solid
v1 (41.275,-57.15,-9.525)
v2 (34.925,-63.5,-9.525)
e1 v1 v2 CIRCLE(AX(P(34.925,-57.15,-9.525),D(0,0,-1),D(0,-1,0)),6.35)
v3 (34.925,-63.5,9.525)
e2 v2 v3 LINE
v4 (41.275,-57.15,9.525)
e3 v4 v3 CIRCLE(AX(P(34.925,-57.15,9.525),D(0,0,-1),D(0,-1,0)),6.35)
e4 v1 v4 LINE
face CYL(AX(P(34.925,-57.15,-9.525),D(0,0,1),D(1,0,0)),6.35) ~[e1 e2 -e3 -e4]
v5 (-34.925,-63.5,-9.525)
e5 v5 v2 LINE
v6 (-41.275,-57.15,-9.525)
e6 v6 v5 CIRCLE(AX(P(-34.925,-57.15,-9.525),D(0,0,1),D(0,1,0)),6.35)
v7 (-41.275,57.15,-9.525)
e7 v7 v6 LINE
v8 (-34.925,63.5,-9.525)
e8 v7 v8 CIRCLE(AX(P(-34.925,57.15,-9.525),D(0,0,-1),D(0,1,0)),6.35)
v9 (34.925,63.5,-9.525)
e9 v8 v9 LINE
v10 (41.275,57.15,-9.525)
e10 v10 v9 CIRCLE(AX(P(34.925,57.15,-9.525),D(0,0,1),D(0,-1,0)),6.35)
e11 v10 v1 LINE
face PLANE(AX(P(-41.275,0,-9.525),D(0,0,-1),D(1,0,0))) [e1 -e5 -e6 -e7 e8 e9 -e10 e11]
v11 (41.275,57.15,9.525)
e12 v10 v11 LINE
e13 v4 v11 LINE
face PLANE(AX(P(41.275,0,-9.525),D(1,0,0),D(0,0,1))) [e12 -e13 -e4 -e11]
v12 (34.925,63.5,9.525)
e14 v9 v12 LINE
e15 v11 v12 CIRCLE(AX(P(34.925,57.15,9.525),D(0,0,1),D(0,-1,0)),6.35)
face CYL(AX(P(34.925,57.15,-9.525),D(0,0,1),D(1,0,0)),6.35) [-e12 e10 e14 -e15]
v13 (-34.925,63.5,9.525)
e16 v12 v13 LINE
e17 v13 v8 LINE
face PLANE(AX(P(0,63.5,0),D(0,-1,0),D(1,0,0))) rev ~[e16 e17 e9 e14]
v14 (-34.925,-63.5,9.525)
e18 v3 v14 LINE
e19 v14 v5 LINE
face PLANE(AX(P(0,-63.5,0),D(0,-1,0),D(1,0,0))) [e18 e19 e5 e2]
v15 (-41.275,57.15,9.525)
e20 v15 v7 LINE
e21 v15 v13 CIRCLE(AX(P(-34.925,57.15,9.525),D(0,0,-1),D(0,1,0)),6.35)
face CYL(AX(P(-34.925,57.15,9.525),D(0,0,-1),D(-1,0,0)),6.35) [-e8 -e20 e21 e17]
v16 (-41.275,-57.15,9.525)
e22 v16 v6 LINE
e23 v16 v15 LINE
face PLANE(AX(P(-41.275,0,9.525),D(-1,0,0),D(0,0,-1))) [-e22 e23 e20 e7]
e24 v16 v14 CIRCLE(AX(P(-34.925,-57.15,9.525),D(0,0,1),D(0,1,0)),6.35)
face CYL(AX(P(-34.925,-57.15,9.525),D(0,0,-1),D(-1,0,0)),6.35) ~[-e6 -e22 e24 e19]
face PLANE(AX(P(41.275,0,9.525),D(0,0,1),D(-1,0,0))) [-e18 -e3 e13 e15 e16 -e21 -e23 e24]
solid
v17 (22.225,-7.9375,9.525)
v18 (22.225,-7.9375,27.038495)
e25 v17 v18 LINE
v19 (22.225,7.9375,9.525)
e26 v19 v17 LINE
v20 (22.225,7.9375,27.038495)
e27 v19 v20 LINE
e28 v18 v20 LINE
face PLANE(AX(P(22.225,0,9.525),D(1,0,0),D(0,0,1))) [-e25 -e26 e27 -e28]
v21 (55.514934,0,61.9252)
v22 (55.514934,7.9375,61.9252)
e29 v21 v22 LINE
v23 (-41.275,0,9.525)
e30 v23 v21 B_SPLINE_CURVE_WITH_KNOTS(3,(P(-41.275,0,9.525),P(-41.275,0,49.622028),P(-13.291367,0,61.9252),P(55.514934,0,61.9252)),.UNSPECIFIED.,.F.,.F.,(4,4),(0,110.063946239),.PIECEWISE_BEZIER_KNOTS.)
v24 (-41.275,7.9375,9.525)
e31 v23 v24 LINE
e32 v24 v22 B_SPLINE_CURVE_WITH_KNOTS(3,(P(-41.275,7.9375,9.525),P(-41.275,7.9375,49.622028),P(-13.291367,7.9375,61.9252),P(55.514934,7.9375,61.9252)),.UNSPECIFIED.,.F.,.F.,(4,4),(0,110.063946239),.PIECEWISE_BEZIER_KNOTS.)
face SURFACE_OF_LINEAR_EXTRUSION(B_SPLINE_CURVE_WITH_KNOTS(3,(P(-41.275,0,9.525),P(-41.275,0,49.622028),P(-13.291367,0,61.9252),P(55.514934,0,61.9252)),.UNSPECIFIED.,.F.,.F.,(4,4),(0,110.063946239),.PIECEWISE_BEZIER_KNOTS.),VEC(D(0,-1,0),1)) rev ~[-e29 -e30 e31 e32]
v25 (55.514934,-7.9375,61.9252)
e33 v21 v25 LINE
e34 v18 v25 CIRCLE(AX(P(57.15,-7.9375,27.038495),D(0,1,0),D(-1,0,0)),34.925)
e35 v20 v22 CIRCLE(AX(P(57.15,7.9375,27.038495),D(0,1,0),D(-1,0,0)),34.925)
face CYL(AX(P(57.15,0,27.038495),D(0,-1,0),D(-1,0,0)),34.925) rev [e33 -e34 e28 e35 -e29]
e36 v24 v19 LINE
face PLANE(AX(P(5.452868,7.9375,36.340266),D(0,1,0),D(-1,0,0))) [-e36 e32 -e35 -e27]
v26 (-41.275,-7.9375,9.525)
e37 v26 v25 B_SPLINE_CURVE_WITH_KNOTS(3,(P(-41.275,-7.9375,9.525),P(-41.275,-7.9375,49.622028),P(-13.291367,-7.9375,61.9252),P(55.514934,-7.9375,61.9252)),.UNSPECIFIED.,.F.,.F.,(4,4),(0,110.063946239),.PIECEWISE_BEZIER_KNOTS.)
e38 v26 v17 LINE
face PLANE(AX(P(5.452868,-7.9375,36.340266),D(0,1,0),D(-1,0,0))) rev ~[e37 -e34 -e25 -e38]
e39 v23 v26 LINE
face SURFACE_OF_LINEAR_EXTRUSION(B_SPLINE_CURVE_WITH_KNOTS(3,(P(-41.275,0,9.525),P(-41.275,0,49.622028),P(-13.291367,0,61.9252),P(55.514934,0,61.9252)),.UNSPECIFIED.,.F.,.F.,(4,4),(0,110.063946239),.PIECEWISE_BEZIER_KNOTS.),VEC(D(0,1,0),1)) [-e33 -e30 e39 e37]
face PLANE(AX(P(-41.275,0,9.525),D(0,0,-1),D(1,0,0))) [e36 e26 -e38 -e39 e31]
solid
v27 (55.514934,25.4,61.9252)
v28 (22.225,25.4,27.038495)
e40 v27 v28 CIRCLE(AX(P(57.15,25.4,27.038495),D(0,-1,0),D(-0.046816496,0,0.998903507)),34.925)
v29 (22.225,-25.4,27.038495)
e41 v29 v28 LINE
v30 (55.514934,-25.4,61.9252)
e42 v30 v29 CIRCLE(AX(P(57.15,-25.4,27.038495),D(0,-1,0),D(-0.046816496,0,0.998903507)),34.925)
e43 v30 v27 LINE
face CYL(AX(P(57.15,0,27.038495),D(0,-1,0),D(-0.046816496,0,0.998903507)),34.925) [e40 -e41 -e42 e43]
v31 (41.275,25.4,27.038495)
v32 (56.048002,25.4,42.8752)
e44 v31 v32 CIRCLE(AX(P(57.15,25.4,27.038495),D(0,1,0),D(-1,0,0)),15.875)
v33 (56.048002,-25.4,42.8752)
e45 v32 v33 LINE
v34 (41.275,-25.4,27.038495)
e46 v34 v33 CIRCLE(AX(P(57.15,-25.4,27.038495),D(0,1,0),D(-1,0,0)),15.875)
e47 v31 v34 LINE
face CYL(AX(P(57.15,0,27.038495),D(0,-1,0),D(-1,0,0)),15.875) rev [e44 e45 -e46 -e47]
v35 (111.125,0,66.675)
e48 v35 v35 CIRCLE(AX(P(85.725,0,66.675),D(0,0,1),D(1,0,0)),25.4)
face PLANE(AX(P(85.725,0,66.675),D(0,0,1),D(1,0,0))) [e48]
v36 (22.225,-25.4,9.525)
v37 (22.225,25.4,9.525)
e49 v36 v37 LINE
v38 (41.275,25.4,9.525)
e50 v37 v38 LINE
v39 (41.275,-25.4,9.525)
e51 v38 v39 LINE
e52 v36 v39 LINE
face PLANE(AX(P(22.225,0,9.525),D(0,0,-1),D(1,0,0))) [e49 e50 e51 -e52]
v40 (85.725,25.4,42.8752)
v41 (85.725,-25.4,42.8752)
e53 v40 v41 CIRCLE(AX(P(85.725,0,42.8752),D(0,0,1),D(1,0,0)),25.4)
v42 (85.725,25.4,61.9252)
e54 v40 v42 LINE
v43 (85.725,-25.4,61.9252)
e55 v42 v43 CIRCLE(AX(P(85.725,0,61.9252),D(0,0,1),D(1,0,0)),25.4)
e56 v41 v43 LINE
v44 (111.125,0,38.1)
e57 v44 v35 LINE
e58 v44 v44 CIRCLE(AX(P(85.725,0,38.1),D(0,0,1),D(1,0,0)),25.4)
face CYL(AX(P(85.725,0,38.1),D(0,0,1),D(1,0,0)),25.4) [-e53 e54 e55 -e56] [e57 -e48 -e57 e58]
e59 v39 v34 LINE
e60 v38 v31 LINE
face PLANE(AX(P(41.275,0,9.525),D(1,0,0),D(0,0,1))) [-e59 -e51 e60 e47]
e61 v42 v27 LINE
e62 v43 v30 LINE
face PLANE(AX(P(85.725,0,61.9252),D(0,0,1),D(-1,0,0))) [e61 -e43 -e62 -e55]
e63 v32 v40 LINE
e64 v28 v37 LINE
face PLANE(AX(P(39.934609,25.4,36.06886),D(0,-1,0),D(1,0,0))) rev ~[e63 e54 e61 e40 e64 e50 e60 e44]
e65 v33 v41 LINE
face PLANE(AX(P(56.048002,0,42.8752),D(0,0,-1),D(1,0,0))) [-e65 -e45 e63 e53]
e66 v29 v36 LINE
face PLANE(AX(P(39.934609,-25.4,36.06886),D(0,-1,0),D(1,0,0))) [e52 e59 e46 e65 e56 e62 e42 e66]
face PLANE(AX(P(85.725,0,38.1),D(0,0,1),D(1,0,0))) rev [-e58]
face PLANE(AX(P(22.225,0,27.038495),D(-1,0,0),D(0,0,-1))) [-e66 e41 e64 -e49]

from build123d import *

# Parameters (mm, degrees)
F1_DEPTH = 63.5
F0_W     = 25.4
F0_H     = 19.05
F2_DEPTH = 25.4
F3_DEPTH = 7.9375
F5_R     = 6.35


# Not quite as in the source:
# - ends of sketch curves that miss each other by under 0.0002 mm in the source are joined


with BuildPart() as f1:
    # F0 (on Front) → F1 (new body, symmetric)
    with BuildSketch(Plane.XZ):
        Polygon((-41.275, 9.525), (-41.275, -9.525), (41.275, -9.525), (41.275, 9.525), (22.225, 9.525), align=None)
    extrude(amount=F1_DEPTH, both=True)

    # F5
    f5_edges = [f1.edges().sort_by_distance(p)[0] for p in [
        (41.275, -63.5, 0),
        (41.275, 63.5, 0),
        (-41.275, 63.5, 0),
        (-41.275, -63.5, 0),
    ]]
    fillet(f5_edges, radius=F5_R)


with BuildPart() as f2:
    # F0 (on Front) → F2 (new body, symmetric)
    with BuildSketch(Plane.XZ):
        with BuildLine():
            Line((22.225, 9.525), (41.275, 9.525))
            Line((41.275, 9.525), (41.275, 27.038495028))
            ThreePointArc((41.275, 27.038495028), (45.5416010852, 37.8671929938), (56.0480015287, 42.8752))
            Line((56.0480015287, 42.8752), (60.325, 42.8752))
            Line((60.325, 42.8752), (60.325, 61.9252))
            Line((60.325, 61.9252), (55.5149338856, 61.9252))
            ThreePointArc((55.5149338856, 61.9252), (31.8828245638, 51.1491870645), (22.225, 27.038495028))
            Line((22.225, 27.038495028), (22.225, 9.525))
        make_face()
        with Locations((73.025, 52.4002)):
            Rectangle(F0_W, F0_H)
    extrude(amount=F2_DEPTH, both=True)

    # F0 (on Front) → F4 (revolve)
    with BuildSketch(Plane.XZ):
        Polygon((85.725, 66.675), (85.725, 61.9252), (85.725, 42.8752), (85.725, 38.1), (111.125, 38.1), (111.125, 66.675), align=None)
    revolve(axis=Axis((85.725, 0, 52.3875), (0, 0, 1)))


with BuildPart() as f3:
    # F0 (on Front) → F3 (new body, symmetric)
    with BuildSketch(Plane.XZ):
        with BuildLine():
            add(Edge.make_bspline(
                [(-41.275, 9.525), (-41.275, 49.6220278599), (-13.2913665774, 61.9252), (55.5149338856, 61.9252)],
                knots=[0, 0, 0, 0, 110.0639462386, 110.0639462386, 110.0639462386, 110.0639462386], degree=3))
            Line((-41.275, 9.525), (22.225, 9.525))
            Line((22.225, 9.525), (22.225, 27.038495028))
            ThreePointArc((22.225, 27.038495028), (31.8828245638, 51.1491870645), (55.5149338856, 61.9252))
        make_face()
    extrude(amount=F3_DEPTH, both=True)


solid = Compound([f1.part, f2.part, f3.part])
